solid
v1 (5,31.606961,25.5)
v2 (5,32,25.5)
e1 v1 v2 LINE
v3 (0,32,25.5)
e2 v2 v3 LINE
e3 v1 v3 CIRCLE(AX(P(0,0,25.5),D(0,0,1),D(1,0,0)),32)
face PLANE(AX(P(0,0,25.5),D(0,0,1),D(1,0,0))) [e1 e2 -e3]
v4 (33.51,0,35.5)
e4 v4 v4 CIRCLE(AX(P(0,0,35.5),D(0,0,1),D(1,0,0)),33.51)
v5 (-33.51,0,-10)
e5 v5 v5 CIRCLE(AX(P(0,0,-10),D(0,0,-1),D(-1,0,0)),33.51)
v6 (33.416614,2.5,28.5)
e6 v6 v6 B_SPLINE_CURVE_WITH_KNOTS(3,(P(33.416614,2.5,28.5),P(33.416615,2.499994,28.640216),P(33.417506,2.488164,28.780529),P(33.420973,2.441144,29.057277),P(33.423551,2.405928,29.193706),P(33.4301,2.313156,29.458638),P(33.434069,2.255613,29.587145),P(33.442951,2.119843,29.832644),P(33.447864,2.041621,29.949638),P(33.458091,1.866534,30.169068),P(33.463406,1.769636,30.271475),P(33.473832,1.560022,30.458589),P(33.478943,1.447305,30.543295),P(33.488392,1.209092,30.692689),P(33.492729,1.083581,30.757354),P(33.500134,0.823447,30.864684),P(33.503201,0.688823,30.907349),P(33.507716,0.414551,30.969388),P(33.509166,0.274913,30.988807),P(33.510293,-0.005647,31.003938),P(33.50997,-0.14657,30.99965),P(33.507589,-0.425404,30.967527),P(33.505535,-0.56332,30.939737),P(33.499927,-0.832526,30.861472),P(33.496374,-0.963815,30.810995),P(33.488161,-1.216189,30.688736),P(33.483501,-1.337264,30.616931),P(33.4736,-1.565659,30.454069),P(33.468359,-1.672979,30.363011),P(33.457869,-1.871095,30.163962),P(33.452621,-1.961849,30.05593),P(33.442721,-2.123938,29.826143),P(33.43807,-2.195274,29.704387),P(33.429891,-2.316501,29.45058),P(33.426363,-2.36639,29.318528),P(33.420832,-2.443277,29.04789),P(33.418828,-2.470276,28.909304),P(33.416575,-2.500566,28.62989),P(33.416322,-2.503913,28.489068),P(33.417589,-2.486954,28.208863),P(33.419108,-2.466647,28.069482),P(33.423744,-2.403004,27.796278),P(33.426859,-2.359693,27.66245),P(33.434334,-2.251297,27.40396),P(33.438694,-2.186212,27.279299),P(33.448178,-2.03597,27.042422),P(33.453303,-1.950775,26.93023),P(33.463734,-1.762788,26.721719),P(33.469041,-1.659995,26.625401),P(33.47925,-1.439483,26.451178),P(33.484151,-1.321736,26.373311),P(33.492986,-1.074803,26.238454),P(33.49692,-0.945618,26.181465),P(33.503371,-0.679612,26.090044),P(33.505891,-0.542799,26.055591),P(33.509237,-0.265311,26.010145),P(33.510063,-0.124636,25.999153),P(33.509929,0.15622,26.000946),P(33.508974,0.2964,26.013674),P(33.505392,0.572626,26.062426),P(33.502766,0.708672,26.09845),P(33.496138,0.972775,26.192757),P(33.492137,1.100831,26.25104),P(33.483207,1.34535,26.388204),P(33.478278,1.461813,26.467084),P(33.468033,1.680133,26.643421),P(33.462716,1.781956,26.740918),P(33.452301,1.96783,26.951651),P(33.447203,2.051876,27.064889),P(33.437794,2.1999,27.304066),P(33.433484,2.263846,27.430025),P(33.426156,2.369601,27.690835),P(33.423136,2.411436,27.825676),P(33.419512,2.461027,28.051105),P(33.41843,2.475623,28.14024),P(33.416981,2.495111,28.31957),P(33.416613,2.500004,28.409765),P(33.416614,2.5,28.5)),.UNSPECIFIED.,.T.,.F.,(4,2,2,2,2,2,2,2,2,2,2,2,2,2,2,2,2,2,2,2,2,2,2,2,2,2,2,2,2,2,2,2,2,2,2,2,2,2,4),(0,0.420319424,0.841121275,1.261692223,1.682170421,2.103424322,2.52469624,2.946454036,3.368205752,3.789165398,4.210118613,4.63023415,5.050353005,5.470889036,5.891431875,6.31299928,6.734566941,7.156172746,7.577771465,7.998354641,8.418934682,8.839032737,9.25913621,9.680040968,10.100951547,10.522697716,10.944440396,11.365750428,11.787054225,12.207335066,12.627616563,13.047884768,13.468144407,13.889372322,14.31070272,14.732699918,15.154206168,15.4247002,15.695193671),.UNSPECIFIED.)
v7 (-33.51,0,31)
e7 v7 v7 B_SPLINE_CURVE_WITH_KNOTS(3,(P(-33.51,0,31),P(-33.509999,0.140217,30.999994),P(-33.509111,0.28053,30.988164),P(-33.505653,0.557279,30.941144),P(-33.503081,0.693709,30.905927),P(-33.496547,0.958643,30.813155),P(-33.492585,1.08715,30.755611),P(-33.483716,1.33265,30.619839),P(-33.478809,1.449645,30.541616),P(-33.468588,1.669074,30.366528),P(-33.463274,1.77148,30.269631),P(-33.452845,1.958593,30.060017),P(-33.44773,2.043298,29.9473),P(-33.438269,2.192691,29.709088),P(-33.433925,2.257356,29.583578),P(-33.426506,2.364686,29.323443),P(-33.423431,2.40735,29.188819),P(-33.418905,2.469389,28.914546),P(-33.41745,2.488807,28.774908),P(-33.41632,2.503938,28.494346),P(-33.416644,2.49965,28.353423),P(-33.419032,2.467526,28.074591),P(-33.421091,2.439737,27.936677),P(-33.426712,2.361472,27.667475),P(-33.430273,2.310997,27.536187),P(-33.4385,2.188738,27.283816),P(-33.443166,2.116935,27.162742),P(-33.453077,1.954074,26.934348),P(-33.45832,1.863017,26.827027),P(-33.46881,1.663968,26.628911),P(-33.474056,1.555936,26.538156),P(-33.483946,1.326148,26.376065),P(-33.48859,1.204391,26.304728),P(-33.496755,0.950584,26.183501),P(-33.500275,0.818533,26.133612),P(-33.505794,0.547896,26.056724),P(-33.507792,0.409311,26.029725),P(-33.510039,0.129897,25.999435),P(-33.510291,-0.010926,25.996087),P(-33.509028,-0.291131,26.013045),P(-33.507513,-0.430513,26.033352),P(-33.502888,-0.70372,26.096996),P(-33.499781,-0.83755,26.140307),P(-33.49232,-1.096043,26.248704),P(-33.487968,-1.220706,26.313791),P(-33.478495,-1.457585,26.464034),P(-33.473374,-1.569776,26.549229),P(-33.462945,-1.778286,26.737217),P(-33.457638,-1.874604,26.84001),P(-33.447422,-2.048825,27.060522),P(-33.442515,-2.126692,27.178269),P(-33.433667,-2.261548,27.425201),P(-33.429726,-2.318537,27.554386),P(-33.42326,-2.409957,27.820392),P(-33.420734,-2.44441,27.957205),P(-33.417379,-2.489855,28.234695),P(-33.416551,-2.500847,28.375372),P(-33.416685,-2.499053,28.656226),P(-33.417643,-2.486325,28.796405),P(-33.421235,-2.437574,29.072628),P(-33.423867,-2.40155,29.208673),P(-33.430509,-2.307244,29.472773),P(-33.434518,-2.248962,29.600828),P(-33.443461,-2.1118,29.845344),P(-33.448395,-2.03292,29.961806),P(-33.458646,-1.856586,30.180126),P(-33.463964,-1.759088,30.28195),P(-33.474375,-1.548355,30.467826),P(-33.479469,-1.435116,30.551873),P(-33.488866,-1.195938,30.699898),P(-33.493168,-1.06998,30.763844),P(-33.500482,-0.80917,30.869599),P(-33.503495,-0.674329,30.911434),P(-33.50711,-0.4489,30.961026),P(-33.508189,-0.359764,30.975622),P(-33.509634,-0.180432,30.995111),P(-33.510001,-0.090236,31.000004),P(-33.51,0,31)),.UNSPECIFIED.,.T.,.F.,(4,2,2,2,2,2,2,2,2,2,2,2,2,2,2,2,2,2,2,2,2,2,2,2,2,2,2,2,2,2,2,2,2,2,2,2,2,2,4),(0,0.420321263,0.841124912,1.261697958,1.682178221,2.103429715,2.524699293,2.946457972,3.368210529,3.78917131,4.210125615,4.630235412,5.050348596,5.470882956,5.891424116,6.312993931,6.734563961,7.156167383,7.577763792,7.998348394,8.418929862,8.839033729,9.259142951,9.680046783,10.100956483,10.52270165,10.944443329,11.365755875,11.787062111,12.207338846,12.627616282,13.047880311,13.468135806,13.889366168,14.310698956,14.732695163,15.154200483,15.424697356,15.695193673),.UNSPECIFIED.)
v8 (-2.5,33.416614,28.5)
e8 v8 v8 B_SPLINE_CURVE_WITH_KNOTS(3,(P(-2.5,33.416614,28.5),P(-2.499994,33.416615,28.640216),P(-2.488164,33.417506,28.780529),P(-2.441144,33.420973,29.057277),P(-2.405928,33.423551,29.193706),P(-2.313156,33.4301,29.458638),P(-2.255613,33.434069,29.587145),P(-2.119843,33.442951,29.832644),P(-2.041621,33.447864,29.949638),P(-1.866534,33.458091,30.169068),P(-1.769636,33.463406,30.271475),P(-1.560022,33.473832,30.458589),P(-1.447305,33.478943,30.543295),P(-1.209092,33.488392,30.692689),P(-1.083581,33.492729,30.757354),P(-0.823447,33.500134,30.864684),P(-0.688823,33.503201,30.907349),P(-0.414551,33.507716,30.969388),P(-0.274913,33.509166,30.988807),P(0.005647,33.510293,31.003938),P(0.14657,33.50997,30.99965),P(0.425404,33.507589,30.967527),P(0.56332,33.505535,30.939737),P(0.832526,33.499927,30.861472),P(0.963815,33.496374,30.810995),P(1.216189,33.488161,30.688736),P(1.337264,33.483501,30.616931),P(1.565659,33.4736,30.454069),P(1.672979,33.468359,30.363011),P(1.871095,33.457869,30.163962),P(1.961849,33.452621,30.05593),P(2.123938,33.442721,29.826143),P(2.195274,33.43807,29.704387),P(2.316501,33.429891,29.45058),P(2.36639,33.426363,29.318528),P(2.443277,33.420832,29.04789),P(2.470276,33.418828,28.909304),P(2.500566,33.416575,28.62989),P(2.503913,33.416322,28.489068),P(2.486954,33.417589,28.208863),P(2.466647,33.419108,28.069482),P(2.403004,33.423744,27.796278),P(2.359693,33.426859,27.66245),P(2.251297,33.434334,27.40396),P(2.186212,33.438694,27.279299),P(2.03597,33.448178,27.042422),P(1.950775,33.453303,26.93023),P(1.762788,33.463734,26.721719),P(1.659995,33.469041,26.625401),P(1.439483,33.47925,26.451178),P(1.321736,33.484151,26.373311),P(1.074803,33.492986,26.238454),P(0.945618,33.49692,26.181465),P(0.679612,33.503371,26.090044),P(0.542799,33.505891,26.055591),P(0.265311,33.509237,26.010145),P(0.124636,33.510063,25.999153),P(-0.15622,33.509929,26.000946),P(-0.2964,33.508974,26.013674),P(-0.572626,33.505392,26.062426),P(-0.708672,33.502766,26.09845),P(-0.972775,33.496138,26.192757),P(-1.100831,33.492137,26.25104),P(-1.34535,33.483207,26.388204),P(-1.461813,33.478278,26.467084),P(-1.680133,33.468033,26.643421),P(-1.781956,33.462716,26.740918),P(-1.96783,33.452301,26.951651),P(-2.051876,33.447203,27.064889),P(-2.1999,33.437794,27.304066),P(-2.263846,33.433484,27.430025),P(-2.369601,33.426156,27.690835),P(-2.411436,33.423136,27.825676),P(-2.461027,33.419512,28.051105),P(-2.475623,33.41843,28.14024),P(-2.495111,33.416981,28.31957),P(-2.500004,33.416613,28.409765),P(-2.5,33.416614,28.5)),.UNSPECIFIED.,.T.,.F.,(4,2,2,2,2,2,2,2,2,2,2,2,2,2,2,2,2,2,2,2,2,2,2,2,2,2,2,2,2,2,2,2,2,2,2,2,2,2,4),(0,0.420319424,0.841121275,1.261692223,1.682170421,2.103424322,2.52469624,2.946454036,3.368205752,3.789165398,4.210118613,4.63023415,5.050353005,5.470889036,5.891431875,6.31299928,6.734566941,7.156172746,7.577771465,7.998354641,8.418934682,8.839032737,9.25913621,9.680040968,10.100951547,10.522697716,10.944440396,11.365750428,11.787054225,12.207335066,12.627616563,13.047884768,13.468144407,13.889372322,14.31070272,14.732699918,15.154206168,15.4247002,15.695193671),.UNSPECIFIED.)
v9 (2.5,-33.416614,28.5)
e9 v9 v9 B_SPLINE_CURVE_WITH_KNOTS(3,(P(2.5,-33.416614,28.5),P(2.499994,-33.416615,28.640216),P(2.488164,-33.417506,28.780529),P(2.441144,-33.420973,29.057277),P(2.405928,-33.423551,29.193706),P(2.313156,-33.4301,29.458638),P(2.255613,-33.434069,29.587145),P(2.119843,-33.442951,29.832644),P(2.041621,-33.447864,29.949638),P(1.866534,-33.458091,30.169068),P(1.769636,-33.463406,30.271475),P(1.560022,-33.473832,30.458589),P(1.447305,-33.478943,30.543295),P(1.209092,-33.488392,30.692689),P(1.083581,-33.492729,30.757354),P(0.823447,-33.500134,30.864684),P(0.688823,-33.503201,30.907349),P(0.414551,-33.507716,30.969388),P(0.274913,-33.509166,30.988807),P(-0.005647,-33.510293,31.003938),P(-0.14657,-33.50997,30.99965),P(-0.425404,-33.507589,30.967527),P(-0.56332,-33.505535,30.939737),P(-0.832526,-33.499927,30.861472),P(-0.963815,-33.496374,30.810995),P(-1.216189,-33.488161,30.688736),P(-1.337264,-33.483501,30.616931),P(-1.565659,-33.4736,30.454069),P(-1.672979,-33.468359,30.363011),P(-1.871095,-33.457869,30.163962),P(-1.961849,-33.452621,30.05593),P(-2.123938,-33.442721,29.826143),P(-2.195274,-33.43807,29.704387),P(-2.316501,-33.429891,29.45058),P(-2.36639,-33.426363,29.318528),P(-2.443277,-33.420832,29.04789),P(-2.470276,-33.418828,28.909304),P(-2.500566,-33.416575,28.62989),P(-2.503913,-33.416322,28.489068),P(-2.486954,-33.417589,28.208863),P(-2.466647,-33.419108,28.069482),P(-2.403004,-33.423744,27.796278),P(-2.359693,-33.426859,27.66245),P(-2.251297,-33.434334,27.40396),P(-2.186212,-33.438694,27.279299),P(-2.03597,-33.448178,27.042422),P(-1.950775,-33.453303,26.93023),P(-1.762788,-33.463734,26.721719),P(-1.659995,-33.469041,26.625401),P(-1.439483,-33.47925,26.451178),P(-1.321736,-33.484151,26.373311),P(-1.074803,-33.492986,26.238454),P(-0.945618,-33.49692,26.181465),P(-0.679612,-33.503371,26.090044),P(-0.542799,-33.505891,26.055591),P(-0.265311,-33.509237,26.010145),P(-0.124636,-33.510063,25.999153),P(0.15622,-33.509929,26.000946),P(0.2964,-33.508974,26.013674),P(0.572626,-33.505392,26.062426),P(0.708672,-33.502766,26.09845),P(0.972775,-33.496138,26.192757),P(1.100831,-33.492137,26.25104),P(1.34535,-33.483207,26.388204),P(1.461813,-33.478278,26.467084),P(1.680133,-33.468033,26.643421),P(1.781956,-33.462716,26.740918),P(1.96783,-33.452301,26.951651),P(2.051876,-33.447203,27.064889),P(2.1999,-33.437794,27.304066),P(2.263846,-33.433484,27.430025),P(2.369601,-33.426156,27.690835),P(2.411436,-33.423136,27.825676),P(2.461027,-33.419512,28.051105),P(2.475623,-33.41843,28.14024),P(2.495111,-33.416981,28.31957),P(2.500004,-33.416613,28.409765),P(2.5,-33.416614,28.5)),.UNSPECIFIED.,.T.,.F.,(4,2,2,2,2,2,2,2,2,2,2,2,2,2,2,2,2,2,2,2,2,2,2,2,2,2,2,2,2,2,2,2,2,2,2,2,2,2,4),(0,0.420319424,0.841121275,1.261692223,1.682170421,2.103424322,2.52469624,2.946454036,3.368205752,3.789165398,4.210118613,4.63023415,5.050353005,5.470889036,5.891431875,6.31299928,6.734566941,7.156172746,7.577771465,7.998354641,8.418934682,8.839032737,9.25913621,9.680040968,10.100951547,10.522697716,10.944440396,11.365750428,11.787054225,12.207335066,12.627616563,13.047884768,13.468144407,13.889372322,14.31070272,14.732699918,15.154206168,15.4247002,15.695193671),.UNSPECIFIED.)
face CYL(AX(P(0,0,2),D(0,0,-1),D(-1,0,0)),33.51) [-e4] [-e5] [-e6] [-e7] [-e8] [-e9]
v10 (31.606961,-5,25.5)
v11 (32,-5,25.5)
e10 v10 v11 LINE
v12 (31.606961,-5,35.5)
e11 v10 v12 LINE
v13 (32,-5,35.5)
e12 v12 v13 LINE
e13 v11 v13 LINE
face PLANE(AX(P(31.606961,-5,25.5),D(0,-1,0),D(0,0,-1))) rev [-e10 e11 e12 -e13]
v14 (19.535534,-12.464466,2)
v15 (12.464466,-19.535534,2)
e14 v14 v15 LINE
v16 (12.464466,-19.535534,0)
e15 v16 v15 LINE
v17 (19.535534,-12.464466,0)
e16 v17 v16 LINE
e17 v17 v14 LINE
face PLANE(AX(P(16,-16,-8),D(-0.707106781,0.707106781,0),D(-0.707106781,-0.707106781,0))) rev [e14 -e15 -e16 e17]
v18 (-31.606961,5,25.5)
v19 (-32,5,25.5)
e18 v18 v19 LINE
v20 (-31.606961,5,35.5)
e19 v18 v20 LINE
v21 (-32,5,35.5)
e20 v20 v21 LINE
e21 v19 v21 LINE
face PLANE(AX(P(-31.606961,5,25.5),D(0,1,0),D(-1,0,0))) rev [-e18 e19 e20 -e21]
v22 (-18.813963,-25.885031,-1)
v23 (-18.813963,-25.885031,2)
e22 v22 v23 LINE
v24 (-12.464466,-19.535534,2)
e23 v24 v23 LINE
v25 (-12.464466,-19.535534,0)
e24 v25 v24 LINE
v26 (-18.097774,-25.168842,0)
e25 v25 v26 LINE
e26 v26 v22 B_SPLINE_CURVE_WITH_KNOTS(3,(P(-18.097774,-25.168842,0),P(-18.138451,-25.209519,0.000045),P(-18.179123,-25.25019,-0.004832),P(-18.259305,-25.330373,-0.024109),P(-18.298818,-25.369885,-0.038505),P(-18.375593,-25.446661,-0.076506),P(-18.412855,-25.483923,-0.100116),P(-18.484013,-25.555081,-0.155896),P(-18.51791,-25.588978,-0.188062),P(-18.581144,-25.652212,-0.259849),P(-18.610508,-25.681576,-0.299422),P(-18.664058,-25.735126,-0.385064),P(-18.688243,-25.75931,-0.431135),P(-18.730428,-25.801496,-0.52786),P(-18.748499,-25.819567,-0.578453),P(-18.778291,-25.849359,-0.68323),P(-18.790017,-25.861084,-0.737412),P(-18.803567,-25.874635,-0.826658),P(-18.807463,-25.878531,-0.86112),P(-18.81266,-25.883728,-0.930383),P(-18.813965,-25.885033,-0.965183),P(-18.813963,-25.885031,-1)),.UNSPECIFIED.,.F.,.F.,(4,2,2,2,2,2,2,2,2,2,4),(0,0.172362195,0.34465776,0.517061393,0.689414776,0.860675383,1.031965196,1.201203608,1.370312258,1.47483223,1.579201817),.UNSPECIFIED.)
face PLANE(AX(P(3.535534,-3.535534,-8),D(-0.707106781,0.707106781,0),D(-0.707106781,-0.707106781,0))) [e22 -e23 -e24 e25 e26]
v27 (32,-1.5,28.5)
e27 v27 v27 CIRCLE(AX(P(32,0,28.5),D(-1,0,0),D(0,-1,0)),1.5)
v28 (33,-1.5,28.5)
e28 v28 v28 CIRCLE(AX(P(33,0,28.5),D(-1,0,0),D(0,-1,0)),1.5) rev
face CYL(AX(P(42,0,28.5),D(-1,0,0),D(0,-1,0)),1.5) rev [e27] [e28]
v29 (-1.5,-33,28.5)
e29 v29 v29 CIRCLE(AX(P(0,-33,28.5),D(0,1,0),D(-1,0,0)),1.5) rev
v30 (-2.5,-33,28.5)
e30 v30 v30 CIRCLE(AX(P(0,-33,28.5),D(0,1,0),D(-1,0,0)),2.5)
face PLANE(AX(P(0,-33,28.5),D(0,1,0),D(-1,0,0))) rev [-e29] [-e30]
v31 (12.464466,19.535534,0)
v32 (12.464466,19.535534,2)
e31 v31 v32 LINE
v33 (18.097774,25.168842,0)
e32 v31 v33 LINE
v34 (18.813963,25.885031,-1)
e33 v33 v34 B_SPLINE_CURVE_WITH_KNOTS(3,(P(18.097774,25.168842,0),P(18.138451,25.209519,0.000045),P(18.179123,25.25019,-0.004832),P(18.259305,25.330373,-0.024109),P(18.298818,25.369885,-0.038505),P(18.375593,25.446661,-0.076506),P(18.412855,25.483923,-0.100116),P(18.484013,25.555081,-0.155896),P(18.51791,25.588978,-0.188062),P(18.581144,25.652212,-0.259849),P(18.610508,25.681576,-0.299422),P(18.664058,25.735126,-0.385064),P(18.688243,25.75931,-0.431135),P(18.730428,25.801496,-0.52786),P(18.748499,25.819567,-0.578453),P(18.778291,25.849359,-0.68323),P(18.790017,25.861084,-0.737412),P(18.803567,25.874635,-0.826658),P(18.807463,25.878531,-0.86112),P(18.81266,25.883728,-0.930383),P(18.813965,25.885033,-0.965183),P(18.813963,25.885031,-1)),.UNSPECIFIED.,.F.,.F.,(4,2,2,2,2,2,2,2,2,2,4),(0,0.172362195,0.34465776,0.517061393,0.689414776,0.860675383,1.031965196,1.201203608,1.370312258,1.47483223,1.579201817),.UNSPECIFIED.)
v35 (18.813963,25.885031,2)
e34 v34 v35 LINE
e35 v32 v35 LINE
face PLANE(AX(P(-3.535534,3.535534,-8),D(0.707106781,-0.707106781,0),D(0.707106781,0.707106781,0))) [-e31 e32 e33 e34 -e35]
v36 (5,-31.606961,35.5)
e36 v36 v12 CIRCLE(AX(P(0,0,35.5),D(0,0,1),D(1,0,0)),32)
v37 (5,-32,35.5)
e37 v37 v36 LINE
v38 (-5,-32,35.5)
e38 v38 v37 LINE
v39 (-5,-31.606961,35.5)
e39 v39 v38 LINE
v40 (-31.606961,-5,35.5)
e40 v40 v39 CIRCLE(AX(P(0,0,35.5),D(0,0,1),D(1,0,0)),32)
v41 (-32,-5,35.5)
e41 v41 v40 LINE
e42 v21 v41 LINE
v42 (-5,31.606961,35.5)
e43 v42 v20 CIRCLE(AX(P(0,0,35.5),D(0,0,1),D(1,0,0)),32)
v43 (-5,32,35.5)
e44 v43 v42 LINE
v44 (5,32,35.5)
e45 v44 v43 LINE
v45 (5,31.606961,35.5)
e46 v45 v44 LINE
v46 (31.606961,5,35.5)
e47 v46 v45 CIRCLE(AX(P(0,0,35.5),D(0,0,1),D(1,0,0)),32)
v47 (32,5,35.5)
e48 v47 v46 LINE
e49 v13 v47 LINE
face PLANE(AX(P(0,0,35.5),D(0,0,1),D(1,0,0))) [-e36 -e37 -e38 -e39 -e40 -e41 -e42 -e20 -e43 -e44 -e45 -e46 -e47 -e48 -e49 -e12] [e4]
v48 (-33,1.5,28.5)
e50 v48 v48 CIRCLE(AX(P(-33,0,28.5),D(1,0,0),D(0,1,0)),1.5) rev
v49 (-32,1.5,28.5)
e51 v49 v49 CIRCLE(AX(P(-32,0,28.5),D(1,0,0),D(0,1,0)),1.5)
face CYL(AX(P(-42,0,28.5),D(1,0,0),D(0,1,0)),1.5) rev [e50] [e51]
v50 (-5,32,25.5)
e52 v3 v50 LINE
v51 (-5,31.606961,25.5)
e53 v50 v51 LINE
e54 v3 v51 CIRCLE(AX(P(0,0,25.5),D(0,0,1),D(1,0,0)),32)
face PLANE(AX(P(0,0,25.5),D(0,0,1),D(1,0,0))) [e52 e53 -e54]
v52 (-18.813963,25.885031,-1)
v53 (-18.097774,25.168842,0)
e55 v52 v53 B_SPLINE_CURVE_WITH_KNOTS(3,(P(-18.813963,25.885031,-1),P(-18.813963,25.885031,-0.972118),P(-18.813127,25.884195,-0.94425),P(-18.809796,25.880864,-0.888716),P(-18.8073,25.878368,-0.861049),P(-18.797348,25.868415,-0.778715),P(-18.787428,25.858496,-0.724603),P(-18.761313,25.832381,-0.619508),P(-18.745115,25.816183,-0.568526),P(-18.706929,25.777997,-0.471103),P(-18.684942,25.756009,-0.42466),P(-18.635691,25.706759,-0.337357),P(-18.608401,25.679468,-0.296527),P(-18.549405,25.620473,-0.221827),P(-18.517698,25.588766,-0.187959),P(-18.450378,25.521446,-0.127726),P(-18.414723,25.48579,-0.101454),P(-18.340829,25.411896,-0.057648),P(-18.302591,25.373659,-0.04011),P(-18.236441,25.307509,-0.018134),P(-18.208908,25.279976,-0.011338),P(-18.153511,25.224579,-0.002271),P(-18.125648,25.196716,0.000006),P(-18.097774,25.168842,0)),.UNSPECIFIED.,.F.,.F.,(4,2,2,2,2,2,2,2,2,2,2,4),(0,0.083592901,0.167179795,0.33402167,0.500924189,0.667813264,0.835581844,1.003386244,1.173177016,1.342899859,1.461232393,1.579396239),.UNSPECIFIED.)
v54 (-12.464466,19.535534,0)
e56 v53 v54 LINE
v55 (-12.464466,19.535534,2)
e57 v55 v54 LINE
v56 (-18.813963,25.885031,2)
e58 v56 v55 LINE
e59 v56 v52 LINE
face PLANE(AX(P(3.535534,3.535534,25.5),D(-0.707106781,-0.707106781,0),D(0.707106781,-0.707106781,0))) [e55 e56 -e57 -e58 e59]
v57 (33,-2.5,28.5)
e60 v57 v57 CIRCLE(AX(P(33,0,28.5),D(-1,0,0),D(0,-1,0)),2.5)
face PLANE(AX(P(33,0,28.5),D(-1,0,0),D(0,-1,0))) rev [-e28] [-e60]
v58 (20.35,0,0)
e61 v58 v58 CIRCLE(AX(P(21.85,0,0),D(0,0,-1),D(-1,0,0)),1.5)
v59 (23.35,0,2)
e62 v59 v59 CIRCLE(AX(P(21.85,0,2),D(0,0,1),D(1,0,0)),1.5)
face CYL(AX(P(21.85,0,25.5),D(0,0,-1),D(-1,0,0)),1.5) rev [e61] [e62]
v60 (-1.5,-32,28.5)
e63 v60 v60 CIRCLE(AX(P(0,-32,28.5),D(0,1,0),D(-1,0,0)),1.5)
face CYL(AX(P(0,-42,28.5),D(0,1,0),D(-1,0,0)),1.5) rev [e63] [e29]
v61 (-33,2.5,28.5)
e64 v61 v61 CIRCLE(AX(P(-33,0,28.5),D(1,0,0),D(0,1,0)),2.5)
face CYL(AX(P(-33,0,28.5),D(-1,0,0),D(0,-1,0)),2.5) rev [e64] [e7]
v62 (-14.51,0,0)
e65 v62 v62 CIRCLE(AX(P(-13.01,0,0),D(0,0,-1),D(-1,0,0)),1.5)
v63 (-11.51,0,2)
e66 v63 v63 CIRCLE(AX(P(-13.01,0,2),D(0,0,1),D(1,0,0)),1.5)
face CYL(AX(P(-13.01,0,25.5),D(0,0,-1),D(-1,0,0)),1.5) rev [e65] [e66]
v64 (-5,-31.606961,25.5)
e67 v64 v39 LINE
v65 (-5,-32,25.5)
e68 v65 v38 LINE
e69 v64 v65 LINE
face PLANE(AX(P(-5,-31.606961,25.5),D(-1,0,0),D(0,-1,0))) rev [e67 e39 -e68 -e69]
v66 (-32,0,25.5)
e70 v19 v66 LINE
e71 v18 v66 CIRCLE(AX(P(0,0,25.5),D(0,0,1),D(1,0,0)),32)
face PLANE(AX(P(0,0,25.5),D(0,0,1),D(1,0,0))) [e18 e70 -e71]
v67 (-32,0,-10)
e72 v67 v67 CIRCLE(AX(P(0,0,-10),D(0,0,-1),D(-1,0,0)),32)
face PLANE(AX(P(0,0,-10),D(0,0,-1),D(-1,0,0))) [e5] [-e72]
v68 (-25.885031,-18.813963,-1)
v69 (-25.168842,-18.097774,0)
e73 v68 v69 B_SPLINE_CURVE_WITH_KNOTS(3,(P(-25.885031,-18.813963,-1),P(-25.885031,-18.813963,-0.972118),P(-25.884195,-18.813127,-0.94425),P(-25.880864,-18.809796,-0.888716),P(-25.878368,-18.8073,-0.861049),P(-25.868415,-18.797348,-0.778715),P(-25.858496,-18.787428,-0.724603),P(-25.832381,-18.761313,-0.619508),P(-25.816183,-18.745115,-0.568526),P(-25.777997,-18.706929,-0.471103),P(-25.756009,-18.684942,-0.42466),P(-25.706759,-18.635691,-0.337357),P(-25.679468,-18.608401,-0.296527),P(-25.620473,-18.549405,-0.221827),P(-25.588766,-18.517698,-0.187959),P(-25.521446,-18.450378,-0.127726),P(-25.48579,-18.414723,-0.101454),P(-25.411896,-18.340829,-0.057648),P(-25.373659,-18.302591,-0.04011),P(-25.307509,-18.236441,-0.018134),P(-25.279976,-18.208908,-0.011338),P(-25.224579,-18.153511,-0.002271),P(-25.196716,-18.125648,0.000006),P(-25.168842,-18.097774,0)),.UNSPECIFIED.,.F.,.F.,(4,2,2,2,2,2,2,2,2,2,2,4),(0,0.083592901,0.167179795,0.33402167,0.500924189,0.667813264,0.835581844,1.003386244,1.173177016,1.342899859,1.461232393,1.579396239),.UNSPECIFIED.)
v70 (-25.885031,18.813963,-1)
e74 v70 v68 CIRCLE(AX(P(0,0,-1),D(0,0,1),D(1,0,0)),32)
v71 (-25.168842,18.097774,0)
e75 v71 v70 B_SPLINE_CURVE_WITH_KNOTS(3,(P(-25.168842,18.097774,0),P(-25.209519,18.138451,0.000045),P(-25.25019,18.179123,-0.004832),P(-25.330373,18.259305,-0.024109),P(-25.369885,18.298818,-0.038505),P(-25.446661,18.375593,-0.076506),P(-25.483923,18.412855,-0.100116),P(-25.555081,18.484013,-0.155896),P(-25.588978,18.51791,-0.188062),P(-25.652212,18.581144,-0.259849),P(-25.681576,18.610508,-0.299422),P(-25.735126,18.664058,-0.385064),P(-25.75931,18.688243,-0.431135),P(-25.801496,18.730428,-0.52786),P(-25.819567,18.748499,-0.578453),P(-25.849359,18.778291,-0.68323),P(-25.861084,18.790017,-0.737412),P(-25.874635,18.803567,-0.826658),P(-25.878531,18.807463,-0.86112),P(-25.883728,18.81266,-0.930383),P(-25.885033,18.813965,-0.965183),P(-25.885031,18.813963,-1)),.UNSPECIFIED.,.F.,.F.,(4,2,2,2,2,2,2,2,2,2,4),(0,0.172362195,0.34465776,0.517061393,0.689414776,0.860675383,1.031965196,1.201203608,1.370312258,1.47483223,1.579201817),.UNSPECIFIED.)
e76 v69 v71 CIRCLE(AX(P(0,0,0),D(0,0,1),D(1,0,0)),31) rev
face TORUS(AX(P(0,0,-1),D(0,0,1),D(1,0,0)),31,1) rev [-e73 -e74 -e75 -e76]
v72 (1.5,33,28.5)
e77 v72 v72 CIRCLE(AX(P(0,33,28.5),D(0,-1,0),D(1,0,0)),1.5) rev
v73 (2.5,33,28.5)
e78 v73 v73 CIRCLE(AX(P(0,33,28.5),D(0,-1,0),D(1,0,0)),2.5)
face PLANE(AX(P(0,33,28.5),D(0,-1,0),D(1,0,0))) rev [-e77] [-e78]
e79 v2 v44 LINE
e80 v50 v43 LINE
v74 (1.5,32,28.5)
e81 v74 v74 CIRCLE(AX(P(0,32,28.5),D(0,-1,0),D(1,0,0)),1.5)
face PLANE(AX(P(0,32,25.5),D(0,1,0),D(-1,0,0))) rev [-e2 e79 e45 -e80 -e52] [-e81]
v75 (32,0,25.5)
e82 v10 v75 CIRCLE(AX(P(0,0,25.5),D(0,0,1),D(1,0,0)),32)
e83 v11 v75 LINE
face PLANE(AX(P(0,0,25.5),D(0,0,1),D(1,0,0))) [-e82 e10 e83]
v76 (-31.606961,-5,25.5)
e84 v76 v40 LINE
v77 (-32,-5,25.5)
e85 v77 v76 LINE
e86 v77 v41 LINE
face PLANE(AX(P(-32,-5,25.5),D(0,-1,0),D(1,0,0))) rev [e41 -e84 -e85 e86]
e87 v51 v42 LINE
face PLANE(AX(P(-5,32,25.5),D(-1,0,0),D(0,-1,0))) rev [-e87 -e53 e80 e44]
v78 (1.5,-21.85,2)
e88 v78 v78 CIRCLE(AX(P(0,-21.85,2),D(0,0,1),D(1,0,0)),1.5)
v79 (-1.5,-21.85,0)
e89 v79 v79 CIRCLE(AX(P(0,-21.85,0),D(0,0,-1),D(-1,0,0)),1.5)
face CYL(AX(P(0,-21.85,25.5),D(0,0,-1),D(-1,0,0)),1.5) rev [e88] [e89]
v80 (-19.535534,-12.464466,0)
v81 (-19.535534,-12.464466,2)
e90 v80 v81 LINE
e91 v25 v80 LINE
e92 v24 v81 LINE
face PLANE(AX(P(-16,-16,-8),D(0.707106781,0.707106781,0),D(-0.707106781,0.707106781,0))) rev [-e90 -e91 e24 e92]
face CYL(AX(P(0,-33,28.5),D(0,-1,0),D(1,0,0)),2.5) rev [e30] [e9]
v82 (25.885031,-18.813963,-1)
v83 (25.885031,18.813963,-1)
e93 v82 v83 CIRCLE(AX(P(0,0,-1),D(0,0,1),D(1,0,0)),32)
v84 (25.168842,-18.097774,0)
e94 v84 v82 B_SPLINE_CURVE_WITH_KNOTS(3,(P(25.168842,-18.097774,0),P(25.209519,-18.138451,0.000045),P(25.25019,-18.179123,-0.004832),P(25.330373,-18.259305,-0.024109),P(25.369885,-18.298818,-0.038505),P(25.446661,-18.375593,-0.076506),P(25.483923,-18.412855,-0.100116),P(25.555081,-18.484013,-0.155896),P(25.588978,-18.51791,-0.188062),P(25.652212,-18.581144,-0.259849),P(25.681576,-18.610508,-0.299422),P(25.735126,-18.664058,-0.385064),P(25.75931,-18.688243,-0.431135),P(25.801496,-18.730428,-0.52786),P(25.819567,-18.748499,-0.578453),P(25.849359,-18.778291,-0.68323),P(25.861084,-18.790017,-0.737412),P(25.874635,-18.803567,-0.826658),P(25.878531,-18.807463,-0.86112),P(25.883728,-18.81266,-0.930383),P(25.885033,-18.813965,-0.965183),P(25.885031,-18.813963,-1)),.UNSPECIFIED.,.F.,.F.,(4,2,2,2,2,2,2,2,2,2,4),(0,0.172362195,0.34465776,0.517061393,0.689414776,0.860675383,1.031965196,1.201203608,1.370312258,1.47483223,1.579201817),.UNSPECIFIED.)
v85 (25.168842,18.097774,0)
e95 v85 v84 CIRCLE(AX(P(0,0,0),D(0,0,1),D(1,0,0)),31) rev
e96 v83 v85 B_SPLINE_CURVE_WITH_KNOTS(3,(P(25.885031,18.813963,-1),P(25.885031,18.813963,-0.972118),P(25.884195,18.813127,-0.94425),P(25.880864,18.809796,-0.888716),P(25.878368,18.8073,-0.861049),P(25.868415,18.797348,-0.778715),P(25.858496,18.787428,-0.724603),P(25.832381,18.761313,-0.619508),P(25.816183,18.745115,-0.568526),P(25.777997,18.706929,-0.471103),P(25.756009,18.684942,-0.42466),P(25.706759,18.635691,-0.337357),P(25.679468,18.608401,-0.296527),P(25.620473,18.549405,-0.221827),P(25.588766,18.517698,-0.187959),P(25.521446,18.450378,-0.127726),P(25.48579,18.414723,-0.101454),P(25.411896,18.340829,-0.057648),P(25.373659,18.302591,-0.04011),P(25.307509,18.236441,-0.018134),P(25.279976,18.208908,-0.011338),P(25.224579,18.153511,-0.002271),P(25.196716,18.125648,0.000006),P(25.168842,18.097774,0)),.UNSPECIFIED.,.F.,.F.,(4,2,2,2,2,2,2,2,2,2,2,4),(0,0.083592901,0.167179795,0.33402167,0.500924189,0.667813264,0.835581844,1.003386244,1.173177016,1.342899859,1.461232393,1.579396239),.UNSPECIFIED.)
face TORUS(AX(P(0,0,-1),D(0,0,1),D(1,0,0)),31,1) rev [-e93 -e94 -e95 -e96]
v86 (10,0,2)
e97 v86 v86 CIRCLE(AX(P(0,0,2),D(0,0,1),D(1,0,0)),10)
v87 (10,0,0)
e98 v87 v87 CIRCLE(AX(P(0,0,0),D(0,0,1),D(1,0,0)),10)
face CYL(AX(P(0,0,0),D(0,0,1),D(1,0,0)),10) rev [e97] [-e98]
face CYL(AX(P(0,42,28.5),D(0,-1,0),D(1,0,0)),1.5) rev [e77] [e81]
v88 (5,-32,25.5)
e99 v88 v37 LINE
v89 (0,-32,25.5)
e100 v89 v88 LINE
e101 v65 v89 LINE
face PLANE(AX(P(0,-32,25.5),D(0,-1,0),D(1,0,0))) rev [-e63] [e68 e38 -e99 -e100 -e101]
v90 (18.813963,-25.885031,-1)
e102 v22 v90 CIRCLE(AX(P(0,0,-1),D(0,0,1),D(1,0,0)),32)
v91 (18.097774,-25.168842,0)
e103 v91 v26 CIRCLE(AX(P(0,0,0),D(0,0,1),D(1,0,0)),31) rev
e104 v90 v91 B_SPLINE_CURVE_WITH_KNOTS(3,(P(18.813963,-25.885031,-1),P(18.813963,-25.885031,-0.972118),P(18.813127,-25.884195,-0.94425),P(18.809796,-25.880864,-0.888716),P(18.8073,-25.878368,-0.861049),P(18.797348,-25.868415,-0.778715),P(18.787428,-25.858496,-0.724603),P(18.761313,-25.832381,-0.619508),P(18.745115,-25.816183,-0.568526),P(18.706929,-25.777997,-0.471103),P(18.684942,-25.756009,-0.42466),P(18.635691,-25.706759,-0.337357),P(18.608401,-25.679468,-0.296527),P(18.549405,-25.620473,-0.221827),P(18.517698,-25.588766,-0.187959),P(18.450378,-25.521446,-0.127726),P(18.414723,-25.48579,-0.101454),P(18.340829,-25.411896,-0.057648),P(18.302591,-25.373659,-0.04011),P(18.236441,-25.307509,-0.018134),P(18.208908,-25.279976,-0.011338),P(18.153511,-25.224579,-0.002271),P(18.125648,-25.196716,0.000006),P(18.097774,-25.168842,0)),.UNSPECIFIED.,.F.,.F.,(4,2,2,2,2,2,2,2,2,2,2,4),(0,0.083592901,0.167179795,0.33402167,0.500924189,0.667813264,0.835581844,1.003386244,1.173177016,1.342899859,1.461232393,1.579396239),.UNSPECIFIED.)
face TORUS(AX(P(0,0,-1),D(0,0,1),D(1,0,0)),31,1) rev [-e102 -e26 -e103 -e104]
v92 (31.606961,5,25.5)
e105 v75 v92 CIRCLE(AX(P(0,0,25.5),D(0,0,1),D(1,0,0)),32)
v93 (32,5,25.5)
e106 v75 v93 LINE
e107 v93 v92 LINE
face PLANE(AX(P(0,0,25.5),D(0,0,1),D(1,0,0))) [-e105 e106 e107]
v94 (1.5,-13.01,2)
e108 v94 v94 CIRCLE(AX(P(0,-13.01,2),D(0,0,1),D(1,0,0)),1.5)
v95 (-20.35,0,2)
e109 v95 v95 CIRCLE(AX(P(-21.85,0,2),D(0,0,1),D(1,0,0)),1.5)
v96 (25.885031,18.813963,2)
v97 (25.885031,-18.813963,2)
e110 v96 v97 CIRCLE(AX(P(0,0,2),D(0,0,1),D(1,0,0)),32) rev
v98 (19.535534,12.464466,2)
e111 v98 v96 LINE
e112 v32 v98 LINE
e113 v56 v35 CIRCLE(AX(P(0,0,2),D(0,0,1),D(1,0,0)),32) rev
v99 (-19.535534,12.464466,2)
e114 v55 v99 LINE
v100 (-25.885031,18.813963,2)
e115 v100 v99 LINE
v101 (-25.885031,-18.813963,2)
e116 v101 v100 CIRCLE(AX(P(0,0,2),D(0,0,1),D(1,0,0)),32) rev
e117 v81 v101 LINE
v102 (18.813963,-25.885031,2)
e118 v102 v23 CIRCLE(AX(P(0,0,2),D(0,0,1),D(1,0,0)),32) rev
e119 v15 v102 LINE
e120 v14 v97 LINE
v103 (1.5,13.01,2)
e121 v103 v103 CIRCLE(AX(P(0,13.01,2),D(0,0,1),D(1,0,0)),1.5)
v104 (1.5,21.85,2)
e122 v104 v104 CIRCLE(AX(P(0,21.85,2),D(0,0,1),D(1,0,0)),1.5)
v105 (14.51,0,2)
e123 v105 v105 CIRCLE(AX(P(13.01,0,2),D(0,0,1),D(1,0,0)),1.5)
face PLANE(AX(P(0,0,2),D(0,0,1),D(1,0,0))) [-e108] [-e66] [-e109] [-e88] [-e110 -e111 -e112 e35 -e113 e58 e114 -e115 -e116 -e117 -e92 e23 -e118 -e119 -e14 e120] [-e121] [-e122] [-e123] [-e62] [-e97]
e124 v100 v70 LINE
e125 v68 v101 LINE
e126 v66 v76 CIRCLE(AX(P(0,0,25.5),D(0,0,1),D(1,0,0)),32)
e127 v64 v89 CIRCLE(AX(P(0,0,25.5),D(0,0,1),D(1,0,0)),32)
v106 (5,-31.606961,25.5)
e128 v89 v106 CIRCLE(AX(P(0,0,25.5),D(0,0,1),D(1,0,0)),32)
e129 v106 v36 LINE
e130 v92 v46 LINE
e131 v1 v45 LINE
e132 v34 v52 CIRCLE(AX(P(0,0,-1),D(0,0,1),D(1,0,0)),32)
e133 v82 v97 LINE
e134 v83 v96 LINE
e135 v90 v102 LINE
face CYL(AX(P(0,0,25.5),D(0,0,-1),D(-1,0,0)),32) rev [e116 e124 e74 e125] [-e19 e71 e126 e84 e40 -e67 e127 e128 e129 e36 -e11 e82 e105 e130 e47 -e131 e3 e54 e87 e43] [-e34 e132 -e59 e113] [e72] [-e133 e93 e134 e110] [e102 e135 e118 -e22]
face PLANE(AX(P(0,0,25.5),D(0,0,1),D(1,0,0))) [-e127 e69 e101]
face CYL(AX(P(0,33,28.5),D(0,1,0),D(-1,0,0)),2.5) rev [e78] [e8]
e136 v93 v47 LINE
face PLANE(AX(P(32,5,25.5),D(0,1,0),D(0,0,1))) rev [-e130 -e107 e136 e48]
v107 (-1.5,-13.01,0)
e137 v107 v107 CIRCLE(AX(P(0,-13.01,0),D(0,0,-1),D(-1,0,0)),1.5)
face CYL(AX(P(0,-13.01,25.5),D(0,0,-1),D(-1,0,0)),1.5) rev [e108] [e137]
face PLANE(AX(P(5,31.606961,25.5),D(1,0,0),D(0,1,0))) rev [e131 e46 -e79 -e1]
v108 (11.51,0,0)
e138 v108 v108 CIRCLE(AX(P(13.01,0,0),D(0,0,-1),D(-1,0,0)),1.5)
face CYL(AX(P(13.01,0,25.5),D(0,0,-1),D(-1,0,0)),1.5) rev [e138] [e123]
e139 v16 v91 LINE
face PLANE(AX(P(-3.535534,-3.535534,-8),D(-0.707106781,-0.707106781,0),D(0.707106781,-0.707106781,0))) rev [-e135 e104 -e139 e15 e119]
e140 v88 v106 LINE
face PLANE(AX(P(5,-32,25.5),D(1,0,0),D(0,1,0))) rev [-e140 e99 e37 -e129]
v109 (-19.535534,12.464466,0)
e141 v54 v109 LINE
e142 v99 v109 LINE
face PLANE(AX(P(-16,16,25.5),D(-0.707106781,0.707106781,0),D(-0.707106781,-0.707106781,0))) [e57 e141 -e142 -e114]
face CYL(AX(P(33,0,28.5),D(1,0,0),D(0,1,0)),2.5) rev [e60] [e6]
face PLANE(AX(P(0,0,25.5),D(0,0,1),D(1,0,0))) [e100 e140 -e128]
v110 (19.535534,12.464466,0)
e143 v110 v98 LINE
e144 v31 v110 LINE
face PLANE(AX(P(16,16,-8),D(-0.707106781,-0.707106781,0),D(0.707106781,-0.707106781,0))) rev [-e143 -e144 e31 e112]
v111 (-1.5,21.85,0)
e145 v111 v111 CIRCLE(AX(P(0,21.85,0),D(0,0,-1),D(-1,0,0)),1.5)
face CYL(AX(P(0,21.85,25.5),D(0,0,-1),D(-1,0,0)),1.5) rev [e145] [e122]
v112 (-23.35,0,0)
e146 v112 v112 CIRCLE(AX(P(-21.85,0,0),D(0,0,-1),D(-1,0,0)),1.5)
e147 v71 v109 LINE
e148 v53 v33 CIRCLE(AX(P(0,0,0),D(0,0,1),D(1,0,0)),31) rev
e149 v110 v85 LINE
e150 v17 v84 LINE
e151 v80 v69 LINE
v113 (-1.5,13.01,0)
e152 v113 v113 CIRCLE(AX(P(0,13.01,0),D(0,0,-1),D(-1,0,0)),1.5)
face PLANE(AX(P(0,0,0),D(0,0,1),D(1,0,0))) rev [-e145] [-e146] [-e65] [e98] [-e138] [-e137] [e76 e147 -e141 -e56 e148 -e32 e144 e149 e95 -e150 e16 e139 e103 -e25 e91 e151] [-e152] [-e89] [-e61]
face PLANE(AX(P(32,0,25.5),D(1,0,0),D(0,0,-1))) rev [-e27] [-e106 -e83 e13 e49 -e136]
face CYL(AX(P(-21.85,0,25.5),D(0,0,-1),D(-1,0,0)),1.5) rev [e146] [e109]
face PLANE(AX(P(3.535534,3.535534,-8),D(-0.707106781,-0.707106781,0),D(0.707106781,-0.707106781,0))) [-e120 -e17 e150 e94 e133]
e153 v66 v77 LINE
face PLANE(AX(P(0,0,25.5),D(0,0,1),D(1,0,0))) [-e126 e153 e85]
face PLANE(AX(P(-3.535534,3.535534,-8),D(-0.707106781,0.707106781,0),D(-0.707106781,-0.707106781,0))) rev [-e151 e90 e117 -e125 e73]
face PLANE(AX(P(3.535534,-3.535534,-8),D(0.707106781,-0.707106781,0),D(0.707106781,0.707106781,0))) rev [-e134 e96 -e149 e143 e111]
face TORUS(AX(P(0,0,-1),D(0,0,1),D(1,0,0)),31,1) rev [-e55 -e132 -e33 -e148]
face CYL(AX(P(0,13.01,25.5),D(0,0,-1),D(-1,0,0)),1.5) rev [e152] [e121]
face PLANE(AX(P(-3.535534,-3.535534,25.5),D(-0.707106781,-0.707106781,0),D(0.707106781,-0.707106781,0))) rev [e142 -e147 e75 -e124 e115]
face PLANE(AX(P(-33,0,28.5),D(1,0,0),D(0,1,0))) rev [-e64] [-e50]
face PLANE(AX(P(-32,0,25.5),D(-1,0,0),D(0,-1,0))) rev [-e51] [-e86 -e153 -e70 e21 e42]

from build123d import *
from build123d.topology import SkipClean

# Parameters (mm, degrees)
SKETCH1_R               = 33.51
BOSS_EXTRUDE1_DEPTH     = 2
SKETCH2_R               = 33.51
SKETCH2_R_2             = 32
BOSS_EXTRUDE2_DEPTH     = 23.5
SKETCH3_R               = 1.5
CUT_EXTRUDE1_DEPTH      = 54.815334246
SKETCH4_R               = 10
CUT_EXTRUDE2_DEPTH      = 53.896977229
CUT_EXTRUDE3_DEPTH      = 53.896977229
CUT_EXTRUDE3_DEPTH_BACK = 10
BOSS_EXTRUDE3_START     = 10
SKETCH6_R               = 33.51
SKETCH6_R_2             = 32
BOSS_EXTRUDE3_DEPTH     = 10
FILLET1_R               = 1
SKETCH7_R               = 33.51
SKETCH7_R_2             = 32
BOSS_EXTRUDE4_DEPTH     = 10
CUT_EXTRUDE4_DEPTH      = 10
SKETCH9_R               = 1.5
CUT_EXTRUDE5_DEPTH      = 10
CIRPATTERN1_COUNT       = 4
SKETCH11_R              = 2.5
CUT_EXTRUDE6_DEPTH      = 1
CIRPATTERN2_COUNT       = 4


with BuildPart() as part:
    # Sketch1 → Boss-Extrude1 (new body)
    with BuildSketch(Plane.XY):
        Circle(SKETCH1_R)
    extrude(amount=BOSS_EXTRUDE1_DEPTH)

    # Sketch2 → Boss-Extrude2 (add)
    with BuildSketch(Plane.XY.offset(2)):
        Circle(SKETCH2_R)
        Circle(SKETCH2_R_2, mode=Mode.SUBTRACT)
    extrude(amount=BOSS_EXTRUDE2_DEPTH)

    # Sketch3 → Cut-Extrude1 (cut, through all)
    with BuildSketch(Plane(origin=(0, 0, 0), x_dir=(-1, 0, 0), z_dir=(0, 0, -1))):
        with Locations((21.85, 0)):
            Circle(SKETCH3_R)
        with Locations((13.01, 0)):
            Circle(SKETCH3_R)
        with Locations((0, -21.85)):
            Circle(SKETCH3_R)
        with Locations((0, -13.01)):
            Circle(SKETCH3_R)
        with Locations((-21.85, 0)):
            Circle(SKETCH3_R)
        with Locations((-13.01, 0)):
            Circle(SKETCH3_R)
        with Locations((0, 21.85)):
            Circle(SKETCH3_R)
        with Locations((0, 13.01)):
            Circle(SKETCH3_R)
    extrude(amount=-CUT_EXTRUDE1_DEPTH, mode=Mode.SUBTRACT)

    # Sketch4 → Cut-Extrude2 (cut, through all)
    with BuildSketch(Plane.XY.offset(2)):
        Circle(SKETCH4_R)
    extrude(amount=-CUT_EXTRUDE2_DEPTH, mode=Mode.SUBTRACT)

    # Sketch5 → Cut-Extrude3 (cut, two sides: drawn at the far end of the back side and taken through both)
    with BuildSketch(Plane.XY.offset(2).offset(-CUT_EXTRUDE3_DEPTH_BACK)):
        with BuildLine():
            Line((-12.464466094, 19.535533906), (-18.813962733, 25.885030545))
            ThreePointArc((-18.813962733, 25.885030545), (-22.627416998, 22.627416998), (-25.885030545, 18.813962733))
            Line((-25.885030545, 18.813962733), (-19.535533906, 12.464466094))
            Line((-19.535533906, 12.464466094), (-12.464466094, 19.535533906))
        make_face()
        with BuildLine():
            Line((19.535533906, 12.464466094), (25.885030545, 18.813962733))
            ThreePointArc((25.885030545, 18.813962733), (22.627416998, 22.627416998), (18.813962733, 25.885030545))
            Line((18.813962733, 25.885030545), (12.464466094, 19.535533906))
            Line((12.464466094, 19.535533906), (19.535533906, 12.464466094))
        make_face()
        with BuildLine():
            Line((-19.535533906, -12.464466094), (-25.885030545, -18.813962733))
            ThreePointArc((-25.885030545, -18.813962733), (-22.627416998, -22.627416998), (-18.813962733, -25.885030545))
            Line((-18.813962733, -25.885030545), (-12.464466094, -19.535533906))
            Line((-12.464466094, -19.535533906), (-19.535533906, -12.464466094))
        make_face()
        with BuildLine():
            ThreePointArc((18.813962733, -25.885030545), (22.627416998, -22.627416998), (25.885030545, -18.813962733))
            Line((25.885030545, -18.813962733), (19.535533906, -12.464466094))
            Line((19.535533906, -12.464466094), (12.464466094, -19.535533906))
            Line((12.464466094, -19.535533906), (18.813962733, -25.885030545))
        make_face()
    extrude(amount=CUT_EXTRUDE3_DEPTH + CUT_EXTRUDE3_DEPTH_BACK, mode=Mode.SUBTRACT)

    # Sketch6 → Boss-Extrude3 (add)
    with BuildSketch(Plane(origin=(0, 0, 0), x_dir=(-1, 0, 0), z_dir=(0, 0, -1)).offset(BOSS_EXTRUDE3_START)):
        Circle(SKETCH6_R)
        Circle(SKETCH6_R_2, mode=Mode.SUBTRACT)
    extrude(amount=-BOSS_EXTRUDE3_DEPTH)

    # Fillet1
    # the kernel refuses this fillet: 1 mm, written as the material it adds along each edge
    with BuildSketch(Plane(origin=(0, 0, 0), x_dir=(-1, 0, 0), z_dir=(0, -1, 0))) as fillet1_piece_1_section:
        with BuildLine():
            CenterArc((32 - FILLET1_R, FILLET1_R), FILLET1_R, 270, 90)
            Line((32 - FILLET1_R, 0), (32, 0))
            Line((32, 0), (32, FILLET1_R))
        make_face()
    fillet1_piece_1 = revolve(axis=Axis((0, 0, 0), (0, 0, -1)), revolution_arc=40.487221235, mode=Mode.PRIVATE)
    fillet1_piece_1 = split(fillet1_piece_1, bisect_by=Plane(origin=(-23.520787378, 16.449719566, -0.28073515), z_dir=(-0.707106781186554, -0.707106781186541, 0)), keep=Keep.TOP, mode=Mode.PRIVATE)
    add(fillet1_piece_1)
    with BuildSketch(Plane(origin=(0, 0, 0), x_dir=(0.6492899007478581, -0.7605410079587009, 0), z_dir=(0.7605410079587009, 0.6492899007478581, 0))) as fillet1_piece_2_section:
        with BuildLine():
            CenterArc((32 - FILLET1_R, FILLET1_R), FILLET1_R, 270, 90)
            Line((32 - FILLET1_R, 0), (32, 0))
            Line((32, 0), (32, FILLET1_R))
        make_face()
    fillet1_piece_2 = revolve(axis=Axis((0, 0, 0), (0, 0, -1)), revolution_arc=80.976169612, mode=Mode.PRIVATE)
    fillet1_piece_2 = split(fillet1_piece_2, bisect_by=Plane(origin=(12.325678578, -19.39674639, -0.277575032), z_dir=(-0.7071067811865488, -0.7071067811865462, 0)), keep=Keep.TOP, mode=Mode.PRIVATE)
    fillet1_piece_2 = split(fillet1_piece_2, bisect_by=Plane(origin=(-12.325678578, -19.39674639, -0.277575032), z_dir=(0.7071067811865432, -0.7071067811865519, 0)), keep=Keep.TOP, mode=Mode.PRIVATE)
    add(fillet1_piece_2)
    with BuildSketch(Plane(origin=(0, 0, 0), x_dir=(0.7605410079586984, 0.6492899007478611, 0), z_dir=(-0.6492899007478611, 0.7605410079586984, 0))) as fillet1_piece_3_section:
        with BuildLine():
            CenterArc((32 - FILLET1_R, FILLET1_R), FILLET1_R, 270, 90)
            Line((32 - FILLET1_R, 0), (32, 0))
            Line((32, 0), (32, FILLET1_R))
        make_face()
    fillet1_piece_3 = revolve(axis=Axis((0, 0, 0), (0, 0, -1)), revolution_arc=80.976169612, mode=Mode.PRIVATE)
    fillet1_piece_3 = split(fillet1_piece_3, bisect_by=Plane(origin=(19.39674639, -12.325678578, -0.277575032), z_dir=(0.7071067811865495, 0.7071067811865457, 0)), keep=Keep.TOP, mode=Mode.PRIVATE)
    fillet1_piece_3 = split(fillet1_piece_3, bisect_by=Plane(origin=(19.39674639, 12.325678578, -0.277575032), z_dir=(0.7071067811865487, -0.7071067811865466, 0)), keep=Keep.TOP, mode=Mode.PRIVATE)
    add(fillet1_piece_3)
    with BuildSketch(Plane(origin=(0, 0, 0), x_dir=(-0.6492899007478526, 0.7605410079587055, 0), z_dir=(-0.7605410079587055, -0.6492899007478526, 0))) as fillet1_piece_4_section:
        with BuildLine():
            CenterArc((32 - FILLET1_R, FILLET1_R), FILLET1_R, 270, 90)
            Line((32 - FILLET1_R, 0), (32, 0))
            Line((32, 0), (32, FILLET1_R))
        make_face()
    fillet1_piece_4 = revolve(axis=Axis((0, 0, 0), (0, 0, -1)), revolution_arc=80.976169612, mode=Mode.PRIVATE)
    fillet1_piece_4 = split(fillet1_piece_4, bisect_by=Plane(origin=(-12.325678578, 19.39674639, -0.277575032), z_dir=(0.7071067811865538, 0.7071067811865415, 0)), keep=Keep.TOP, mode=Mode.PRIVATE)
    fillet1_piece_4 = split(fillet1_piece_4, bisect_by=Plane(origin=(12.325678578, 19.39674639, -0.277575032), z_dir=(-0.707106781186548, 0.707106781186547, 0)), keep=Keep.TOP, mode=Mode.PRIVATE)
    add(fillet1_piece_4)
    with BuildSketch(Plane(origin=(0, 0, 0), x_dir=(-0.7605507940779602, -0.6492784376732254, 0), z_dir=(0.6492784376732254, -0.7605507940779602, 0))) as fillet1_piece_5_section:
        with BuildLine():
            CenterArc((32 - FILLET1_R, FILLET1_R), FILLET1_R, 270, 90)
            Line((32 - FILLET1_R, 0), (32, 0))
            Line((32, 0), (32, FILLET1_R))
        make_face()
    fillet1_piece_5 = revolve(axis=Axis((0, 0, 0), (0, 0, -1)), revolution_arc=40.487221235, mode=Mode.PRIVATE)
    fillet1_piece_5 = split(fillet1_piece_5, bisect_by=Plane(origin=(-23.520787379, -16.449719567, -0.280735148), z_dir=(-0.7071067811865441, 0.707106781186551, 0)), keep=Keep.TOP, mode=Mode.PRIVATE)
    add(fillet1_piece_5)

    # Sketch7 → Boss-Extrude4 (add)
    with SkipClean():  # the faces are left unmerged after this step: merging them gives an invalid solid
        with BuildSketch(Plane.XY.offset(25.5)):
            with Locations(Location((0, 0, 0), (0, 0, 180))):
                Circle(SKETCH7_R)
            with Locations(Location((0, 0, 0), (0, 0, 180))):
                Circle(SKETCH7_R_2, mode=Mode.SUBTRACT)
        extrude(amount=BOSS_EXTRUDE4_DEPTH)
    add(part.part.scale(1), mode=Mode.REPLACE)  # the faces are merged on a copy

    # Sketch8 → Cut-Extrude4 (cut)
    with BuildSketch(Plane.XY.offset(35.5)):
        Polygon((32, 0), (32, 5), (31.606961259, 5), (31.606961259, -5), (32, -5), align=None)
        Polygon((-5, -32), (0, -32), (5, -32), (5, -31.606961259), (-5, -31.606961259), align=None)
        Polygon((-32, 5), (-32, 0), (-32, -5), (-31.606961259, -5), (-31.606961259, 5), align=None)
        Polygon((5, 32), (0, 32), (-5, 32), (-5, 31.606961259), (5, 31.606961259), align=None)
    extrude(amount=-CUT_EXTRUDE4_DEPTH, mode=Mode.SUBTRACT)

    # Sketch9 → Cut-Extrude5 (cut)
    with BuildSketch(Plane.XZ.offset(-32)):
        with Locations((0, 28.5)):
            Circle(SKETCH9_R)
    cut_extrude5 = extrude(amount=-CUT_EXTRUDE5_DEPTH, mode=Mode.SUBTRACT)

    # CirPattern1: Cut-Extrude5 ×4 about axis
    cirpattern1_axis = Axis((0, 0, 25.5), (0, 0, -1))
    for i in range(1, CIRPATTERN1_COUNT):
        add(cut_extrude5.rotate(cirpattern1_axis, i * 360 / CIRPATTERN1_COUNT), mode=Mode.SUBTRACT)

    # Sketch11 → Cut-Extrude6 (cut)
    with BuildSketch(Plane(origin=(0, 34, 0), x_dir=(-1, 0, 0), z_dir=(0, -1, 0))):
        with Locations((0, -28.5)):
            Circle(SKETCH11_R)
    cut_extrude6 = extrude(amount=CUT_EXTRUDE6_DEPTH, mode=Mode.SUBTRACT)

    # CirPattern2: Cut-Extrude6 ×4 about axis
    cirpattern2_axis = Axis((0, 0, 0), (0, 0, 1))
    for i in range(1, CIRPATTERN2_COUNT):
        add(cut_extrude6.rotate(cirpattern2_axis, i * 360 / CIRPATTERN2_COUNT), mode=Mode.SUBTRACT)


solid = part.part
